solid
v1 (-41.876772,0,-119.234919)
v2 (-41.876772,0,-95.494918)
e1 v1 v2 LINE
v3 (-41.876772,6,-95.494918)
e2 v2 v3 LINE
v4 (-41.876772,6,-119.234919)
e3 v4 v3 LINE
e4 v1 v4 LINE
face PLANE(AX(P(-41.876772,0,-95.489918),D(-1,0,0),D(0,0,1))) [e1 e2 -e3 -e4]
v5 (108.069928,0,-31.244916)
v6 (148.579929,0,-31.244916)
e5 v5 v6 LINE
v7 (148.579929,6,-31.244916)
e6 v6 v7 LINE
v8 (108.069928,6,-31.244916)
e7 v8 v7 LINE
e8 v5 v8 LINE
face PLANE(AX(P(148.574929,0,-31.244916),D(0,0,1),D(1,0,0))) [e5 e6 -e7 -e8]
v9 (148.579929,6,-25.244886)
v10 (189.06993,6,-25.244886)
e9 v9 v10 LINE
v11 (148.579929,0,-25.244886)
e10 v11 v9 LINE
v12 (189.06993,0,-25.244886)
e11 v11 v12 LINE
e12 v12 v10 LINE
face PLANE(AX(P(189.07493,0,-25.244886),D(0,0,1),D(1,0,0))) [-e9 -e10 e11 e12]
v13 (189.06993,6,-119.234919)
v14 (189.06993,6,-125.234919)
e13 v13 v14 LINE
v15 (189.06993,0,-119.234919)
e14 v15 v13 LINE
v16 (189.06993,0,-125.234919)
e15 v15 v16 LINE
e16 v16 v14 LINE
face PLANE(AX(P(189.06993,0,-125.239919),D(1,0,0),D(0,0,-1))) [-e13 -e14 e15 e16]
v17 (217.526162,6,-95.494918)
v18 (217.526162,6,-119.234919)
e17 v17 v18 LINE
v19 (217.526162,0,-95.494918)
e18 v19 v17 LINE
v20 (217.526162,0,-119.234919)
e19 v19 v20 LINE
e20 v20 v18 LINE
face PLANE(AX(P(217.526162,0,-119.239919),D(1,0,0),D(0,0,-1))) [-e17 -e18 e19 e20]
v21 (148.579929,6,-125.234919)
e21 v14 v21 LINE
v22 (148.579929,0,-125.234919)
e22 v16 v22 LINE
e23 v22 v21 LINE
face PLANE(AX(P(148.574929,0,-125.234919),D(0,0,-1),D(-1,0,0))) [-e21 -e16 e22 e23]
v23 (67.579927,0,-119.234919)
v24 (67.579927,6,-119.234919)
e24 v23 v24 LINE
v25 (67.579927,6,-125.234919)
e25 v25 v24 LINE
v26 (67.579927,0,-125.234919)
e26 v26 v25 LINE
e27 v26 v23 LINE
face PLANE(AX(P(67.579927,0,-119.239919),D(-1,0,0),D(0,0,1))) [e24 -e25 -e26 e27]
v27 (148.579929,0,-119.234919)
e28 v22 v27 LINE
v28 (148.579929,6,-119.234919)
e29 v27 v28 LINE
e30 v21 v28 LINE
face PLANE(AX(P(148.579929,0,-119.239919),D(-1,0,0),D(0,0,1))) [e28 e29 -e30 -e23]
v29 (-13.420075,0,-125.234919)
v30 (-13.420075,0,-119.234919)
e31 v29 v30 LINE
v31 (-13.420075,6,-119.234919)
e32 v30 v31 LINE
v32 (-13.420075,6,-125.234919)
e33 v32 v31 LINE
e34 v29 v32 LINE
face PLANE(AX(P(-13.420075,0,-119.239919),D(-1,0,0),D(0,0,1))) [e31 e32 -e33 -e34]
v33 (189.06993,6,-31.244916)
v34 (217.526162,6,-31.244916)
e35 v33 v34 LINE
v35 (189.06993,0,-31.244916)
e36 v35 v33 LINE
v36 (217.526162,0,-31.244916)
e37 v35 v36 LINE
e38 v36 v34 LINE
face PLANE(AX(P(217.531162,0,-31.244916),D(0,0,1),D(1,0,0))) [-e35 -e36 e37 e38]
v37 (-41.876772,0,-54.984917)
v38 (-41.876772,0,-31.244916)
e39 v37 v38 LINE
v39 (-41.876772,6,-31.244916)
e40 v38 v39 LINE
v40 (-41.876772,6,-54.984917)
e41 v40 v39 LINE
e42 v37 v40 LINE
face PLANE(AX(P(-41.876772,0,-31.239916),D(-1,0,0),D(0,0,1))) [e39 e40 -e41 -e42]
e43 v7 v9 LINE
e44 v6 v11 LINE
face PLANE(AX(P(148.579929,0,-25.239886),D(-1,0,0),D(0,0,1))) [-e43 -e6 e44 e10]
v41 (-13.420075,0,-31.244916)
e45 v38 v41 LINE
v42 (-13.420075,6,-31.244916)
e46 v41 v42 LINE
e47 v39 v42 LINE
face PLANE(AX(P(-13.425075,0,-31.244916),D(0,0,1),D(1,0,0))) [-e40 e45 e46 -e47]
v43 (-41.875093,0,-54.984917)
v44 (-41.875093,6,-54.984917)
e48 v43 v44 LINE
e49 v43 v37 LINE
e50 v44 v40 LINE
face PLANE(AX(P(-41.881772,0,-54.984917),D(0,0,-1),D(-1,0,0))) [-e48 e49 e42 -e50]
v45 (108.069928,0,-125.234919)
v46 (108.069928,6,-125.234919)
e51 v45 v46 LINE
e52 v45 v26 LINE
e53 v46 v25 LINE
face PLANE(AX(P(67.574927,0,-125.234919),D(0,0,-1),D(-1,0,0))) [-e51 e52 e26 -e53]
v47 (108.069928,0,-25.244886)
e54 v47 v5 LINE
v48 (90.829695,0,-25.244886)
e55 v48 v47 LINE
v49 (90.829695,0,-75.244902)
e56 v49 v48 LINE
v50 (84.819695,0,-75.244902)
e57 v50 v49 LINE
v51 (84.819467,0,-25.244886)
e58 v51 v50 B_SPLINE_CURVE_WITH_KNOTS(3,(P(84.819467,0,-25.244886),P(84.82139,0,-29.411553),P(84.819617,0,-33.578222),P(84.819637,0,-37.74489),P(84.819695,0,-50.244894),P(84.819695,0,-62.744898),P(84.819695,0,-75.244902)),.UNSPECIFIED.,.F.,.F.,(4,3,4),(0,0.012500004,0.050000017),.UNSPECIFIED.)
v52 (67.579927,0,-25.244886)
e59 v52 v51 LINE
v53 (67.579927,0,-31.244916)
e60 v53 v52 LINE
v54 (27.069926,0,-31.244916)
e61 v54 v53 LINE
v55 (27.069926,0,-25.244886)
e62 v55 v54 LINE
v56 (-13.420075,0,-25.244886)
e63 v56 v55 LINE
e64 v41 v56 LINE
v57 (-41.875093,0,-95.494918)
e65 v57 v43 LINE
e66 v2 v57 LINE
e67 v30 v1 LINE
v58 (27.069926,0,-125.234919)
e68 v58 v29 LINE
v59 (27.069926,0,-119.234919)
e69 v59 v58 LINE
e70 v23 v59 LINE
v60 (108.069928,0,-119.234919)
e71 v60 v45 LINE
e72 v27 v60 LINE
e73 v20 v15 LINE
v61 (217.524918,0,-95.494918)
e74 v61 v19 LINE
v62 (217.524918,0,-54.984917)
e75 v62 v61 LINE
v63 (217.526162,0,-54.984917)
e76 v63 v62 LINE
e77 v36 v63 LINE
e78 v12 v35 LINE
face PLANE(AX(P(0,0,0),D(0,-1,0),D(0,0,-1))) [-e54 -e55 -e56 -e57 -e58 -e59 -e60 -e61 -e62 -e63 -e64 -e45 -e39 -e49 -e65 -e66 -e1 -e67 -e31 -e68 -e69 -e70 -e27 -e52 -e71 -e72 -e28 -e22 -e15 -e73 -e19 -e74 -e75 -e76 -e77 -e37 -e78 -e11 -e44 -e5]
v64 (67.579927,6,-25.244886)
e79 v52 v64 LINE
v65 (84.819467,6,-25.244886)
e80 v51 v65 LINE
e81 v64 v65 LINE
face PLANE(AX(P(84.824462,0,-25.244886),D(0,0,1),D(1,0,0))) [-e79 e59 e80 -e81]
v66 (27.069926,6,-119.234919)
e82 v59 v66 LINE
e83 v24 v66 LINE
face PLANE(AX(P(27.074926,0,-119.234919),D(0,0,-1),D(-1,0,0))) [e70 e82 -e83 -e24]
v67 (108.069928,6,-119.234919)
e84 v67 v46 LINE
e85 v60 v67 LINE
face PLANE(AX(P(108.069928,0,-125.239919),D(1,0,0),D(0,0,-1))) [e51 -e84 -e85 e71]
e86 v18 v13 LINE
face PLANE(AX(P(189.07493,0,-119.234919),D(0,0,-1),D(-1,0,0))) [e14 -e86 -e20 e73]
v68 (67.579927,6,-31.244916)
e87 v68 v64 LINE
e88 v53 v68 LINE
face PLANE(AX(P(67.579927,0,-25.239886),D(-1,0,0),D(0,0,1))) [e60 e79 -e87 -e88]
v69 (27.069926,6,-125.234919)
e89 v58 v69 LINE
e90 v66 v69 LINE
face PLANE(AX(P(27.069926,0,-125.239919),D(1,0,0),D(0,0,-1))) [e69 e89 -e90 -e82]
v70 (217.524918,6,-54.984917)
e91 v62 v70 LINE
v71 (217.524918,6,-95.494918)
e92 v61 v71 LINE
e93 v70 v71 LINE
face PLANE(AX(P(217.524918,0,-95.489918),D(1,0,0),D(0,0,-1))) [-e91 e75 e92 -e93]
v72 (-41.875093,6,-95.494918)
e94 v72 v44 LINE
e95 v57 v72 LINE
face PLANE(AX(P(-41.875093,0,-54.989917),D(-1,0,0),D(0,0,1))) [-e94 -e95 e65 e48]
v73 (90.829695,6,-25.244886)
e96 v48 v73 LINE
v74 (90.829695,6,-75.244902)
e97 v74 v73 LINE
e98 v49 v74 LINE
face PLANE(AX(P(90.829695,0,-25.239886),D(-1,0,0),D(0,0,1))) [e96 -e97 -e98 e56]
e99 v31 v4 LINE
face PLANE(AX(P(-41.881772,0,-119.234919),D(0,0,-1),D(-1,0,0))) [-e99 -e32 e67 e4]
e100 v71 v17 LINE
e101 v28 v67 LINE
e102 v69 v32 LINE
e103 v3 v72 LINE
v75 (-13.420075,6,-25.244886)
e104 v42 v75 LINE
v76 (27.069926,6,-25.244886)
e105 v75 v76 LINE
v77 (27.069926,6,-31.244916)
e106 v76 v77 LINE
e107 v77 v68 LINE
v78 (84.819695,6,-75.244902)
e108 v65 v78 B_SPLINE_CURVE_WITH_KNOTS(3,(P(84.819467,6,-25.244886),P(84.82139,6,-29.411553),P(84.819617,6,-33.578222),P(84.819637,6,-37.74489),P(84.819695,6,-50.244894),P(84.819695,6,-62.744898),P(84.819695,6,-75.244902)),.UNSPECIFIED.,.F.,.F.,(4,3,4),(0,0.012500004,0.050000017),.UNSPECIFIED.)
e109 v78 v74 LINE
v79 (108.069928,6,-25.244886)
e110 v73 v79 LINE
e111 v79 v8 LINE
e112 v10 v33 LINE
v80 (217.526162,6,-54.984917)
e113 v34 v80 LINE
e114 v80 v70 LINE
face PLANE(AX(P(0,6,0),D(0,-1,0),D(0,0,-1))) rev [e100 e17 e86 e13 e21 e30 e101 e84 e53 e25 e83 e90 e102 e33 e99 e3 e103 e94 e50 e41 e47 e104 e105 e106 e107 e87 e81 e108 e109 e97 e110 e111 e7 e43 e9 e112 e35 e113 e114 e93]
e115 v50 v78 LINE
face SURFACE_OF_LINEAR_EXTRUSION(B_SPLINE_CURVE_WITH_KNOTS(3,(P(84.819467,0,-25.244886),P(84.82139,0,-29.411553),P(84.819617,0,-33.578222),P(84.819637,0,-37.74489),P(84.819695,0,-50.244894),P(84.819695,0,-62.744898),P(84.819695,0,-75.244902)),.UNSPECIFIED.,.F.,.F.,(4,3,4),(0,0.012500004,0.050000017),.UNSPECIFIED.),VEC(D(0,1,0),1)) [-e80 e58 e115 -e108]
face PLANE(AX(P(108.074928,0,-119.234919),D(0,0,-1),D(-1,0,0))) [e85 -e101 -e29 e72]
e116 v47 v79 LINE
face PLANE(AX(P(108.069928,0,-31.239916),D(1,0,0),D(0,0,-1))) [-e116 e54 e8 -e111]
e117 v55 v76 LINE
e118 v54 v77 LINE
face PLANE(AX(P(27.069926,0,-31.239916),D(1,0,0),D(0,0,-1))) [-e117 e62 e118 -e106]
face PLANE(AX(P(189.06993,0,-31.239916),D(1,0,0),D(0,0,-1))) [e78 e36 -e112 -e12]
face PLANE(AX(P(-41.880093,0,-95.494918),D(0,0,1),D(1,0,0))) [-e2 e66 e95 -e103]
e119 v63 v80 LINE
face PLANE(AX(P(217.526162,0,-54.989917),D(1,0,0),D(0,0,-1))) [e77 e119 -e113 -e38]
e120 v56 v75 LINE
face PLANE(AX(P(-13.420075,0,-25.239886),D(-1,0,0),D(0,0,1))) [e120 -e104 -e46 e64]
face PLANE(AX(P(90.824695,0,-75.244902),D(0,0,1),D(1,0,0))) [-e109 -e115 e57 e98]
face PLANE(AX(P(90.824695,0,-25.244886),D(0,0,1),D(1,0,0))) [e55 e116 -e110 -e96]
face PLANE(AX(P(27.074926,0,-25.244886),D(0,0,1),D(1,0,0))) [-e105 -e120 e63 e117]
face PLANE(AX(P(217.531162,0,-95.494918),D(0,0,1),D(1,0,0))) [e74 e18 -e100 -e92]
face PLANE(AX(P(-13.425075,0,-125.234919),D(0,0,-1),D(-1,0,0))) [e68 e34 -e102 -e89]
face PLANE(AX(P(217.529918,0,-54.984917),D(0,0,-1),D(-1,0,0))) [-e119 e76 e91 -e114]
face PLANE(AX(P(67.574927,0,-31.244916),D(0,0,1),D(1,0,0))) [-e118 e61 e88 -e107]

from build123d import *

# Parameters (mm, degrees)
SKETCH1_W                   = 515.597416032
SKETCH1_H                   = 317.102213092
BOSS_EXTRUDE1_DEPTH         = 6
CUT_EXTRUDE_THIN1_START     = -6
CUT_EXTRUDE_THIN1_OUTLINE_W = 515.597416032
CUT_EXTRUDE_THIN1_OUTLINE_H = 317.102213092
CUT_EXTRUDE_THIN1_DEPTH     = 6


# Read off the part's stored shape, not the designer's step: Cut-Extrude-Thin1
with BuildPart() as part:
    # Sketch1 → Boss-Extrude1 (new body)
    with BuildSketch(Plane(origin=(0, 0, 0), x_dir=(1, 0, 0), z_dir=(0, 1, 0))):
        Rectangle(SKETCH1_W, SKETCH1_H)
    extrude(amount=BOSS_EXTRUDE1_DEPTH)

    # Cut-Extrude-Thin1 outline → Cut-Extrude-Thin1 (cut)
    with BuildSketch(Plane(origin=(0, 6, 0), x_dir=(1, 0, 0), z_dir=(0, 1, 0)).offset(CUT_EXTRUDE_THIN1_START)):
        Rectangle(CUT_EXTRUDE_THIN1_OUTLINE_W, CUT_EXTRUDE_THIN1_OUTLINE_H)
        with BuildLine():
            add(Edge.make_bspline(
                [(84.819466733, 25.244885548), (84.821389699, 29.41155314), (84.819617483, 33.578221619), (84.819636894, 37.744889655), (84.819695129, 50.244893831), (84.819695129, 62.744898008), (84.819695129, 75.244902185)],
                knots=[0, 0, 0, 0, 0.012500004, 0.012500004, 0.012500004, 0.050000017, 0.050000017, 0.050000017, 0.050000017], degree=3))
            Line((84.819466733, 25.244885548), (67.579926926, 25.244885548))
            Line((67.579926926, 25.244885548), (67.579926926, 31.244916231))
            Line((67.579926926, 31.244916231), (27.06992581, 31.244916231))
            Line((27.06992581, 31.244916231), (27.06992581, 25.244885548))
            Line((27.06992581, 25.244885548), (-13.420075307, 25.244885548))
            Line((-13.420075307, 25.244885548), (-13.420075307, 31.244916231))
            Line((-13.420075307, 31.244916231), (-41.87677177, 31.244916231))
            Line((-41.87677177, 31.244916231), (-41.87677177, 54.984916885))
            Line((-41.87677177, 54.984916885), (-41.875093181, 54.984916885))
            Line((-41.875093181, 54.984916885), (-41.875093181, 95.494918002))
            Line((-41.875093181, 95.494918002), (-41.87677177, 95.494918002))
            Line((-41.87677177, 95.494918002), (-41.87677177, 119.234918656))
            Line((-41.87677177, 119.234918656), (-13.420075307, 119.234918656))
            Line((-13.420075307, 119.234918656), (-13.420075307, 125.234918822))
            Line((-13.420075307, 125.234918822), (27.06992581, 125.234918822))
            Line((27.06992581, 125.234918822), (27.06992581, 119.234918656))
            Line((27.06992581, 119.234918656), (67.579926926, 119.234918656))
            Line((67.579926926, 119.234918656), (67.579926926, 125.234918822))
            Line((67.579926926, 125.234918822), (108.069928043, 125.234918822))
            Line((108.069928043, 125.234918822), (108.069928043, 119.234918656))
            Line((108.069928043, 119.234918656), (148.579929159, 119.234918656))
            Line((148.579929159, 119.234918656), (148.579929159, 125.234918822))
            Line((148.579929159, 125.234918822), (189.069930275, 125.234918822))
            Line((189.069930275, 125.234918822), (189.069930275, 119.234918656))
            Line((189.069930275, 119.234918656), (217.526162193, 119.234918656))
            Line((217.526162193, 119.234918656), (217.526162193, 95.494918002))
            Line((217.526162193, 95.494918002), (217.524917632, 95.494918002))
            Line((217.524917632, 95.494918002), (217.524917632, 54.984916885))
            Line((217.524917632, 54.984916885), (217.526162193, 54.984916885))
            Line((217.526162193, 54.984916885), (217.526162193, 31.244916231))
            Line((217.526162193, 31.244916231), (189.069930275, 31.244916231))
            Line((189.069930275, 31.244916231), (189.069930275, 25.244885548))
            Line((189.069930275, 25.244885548), (148.579929159, 25.244885548))
            Line((148.579929159, 25.244885548), (148.579929159, 31.244916231))
            Line((148.579929159, 31.244916231), (108.069928043, 31.244916231))
            Line((108.069928043, 31.244916231), (108.069928043, 25.244885548))
            Line((108.069928043, 25.244885548), (90.829695294, 25.244885548))
            Line((90.829695294, 25.244885548), (90.829695294, 75.244902185))
            Line((90.829695294, 75.244902185), (84.819695129, 75.244902185))
        make_face(mode=Mode.SUBTRACT)
    extrude(amount=CUT_EXTRUDE_THIN1_DEPTH, mode=Mode.SUBTRACT)


solid = part.part
